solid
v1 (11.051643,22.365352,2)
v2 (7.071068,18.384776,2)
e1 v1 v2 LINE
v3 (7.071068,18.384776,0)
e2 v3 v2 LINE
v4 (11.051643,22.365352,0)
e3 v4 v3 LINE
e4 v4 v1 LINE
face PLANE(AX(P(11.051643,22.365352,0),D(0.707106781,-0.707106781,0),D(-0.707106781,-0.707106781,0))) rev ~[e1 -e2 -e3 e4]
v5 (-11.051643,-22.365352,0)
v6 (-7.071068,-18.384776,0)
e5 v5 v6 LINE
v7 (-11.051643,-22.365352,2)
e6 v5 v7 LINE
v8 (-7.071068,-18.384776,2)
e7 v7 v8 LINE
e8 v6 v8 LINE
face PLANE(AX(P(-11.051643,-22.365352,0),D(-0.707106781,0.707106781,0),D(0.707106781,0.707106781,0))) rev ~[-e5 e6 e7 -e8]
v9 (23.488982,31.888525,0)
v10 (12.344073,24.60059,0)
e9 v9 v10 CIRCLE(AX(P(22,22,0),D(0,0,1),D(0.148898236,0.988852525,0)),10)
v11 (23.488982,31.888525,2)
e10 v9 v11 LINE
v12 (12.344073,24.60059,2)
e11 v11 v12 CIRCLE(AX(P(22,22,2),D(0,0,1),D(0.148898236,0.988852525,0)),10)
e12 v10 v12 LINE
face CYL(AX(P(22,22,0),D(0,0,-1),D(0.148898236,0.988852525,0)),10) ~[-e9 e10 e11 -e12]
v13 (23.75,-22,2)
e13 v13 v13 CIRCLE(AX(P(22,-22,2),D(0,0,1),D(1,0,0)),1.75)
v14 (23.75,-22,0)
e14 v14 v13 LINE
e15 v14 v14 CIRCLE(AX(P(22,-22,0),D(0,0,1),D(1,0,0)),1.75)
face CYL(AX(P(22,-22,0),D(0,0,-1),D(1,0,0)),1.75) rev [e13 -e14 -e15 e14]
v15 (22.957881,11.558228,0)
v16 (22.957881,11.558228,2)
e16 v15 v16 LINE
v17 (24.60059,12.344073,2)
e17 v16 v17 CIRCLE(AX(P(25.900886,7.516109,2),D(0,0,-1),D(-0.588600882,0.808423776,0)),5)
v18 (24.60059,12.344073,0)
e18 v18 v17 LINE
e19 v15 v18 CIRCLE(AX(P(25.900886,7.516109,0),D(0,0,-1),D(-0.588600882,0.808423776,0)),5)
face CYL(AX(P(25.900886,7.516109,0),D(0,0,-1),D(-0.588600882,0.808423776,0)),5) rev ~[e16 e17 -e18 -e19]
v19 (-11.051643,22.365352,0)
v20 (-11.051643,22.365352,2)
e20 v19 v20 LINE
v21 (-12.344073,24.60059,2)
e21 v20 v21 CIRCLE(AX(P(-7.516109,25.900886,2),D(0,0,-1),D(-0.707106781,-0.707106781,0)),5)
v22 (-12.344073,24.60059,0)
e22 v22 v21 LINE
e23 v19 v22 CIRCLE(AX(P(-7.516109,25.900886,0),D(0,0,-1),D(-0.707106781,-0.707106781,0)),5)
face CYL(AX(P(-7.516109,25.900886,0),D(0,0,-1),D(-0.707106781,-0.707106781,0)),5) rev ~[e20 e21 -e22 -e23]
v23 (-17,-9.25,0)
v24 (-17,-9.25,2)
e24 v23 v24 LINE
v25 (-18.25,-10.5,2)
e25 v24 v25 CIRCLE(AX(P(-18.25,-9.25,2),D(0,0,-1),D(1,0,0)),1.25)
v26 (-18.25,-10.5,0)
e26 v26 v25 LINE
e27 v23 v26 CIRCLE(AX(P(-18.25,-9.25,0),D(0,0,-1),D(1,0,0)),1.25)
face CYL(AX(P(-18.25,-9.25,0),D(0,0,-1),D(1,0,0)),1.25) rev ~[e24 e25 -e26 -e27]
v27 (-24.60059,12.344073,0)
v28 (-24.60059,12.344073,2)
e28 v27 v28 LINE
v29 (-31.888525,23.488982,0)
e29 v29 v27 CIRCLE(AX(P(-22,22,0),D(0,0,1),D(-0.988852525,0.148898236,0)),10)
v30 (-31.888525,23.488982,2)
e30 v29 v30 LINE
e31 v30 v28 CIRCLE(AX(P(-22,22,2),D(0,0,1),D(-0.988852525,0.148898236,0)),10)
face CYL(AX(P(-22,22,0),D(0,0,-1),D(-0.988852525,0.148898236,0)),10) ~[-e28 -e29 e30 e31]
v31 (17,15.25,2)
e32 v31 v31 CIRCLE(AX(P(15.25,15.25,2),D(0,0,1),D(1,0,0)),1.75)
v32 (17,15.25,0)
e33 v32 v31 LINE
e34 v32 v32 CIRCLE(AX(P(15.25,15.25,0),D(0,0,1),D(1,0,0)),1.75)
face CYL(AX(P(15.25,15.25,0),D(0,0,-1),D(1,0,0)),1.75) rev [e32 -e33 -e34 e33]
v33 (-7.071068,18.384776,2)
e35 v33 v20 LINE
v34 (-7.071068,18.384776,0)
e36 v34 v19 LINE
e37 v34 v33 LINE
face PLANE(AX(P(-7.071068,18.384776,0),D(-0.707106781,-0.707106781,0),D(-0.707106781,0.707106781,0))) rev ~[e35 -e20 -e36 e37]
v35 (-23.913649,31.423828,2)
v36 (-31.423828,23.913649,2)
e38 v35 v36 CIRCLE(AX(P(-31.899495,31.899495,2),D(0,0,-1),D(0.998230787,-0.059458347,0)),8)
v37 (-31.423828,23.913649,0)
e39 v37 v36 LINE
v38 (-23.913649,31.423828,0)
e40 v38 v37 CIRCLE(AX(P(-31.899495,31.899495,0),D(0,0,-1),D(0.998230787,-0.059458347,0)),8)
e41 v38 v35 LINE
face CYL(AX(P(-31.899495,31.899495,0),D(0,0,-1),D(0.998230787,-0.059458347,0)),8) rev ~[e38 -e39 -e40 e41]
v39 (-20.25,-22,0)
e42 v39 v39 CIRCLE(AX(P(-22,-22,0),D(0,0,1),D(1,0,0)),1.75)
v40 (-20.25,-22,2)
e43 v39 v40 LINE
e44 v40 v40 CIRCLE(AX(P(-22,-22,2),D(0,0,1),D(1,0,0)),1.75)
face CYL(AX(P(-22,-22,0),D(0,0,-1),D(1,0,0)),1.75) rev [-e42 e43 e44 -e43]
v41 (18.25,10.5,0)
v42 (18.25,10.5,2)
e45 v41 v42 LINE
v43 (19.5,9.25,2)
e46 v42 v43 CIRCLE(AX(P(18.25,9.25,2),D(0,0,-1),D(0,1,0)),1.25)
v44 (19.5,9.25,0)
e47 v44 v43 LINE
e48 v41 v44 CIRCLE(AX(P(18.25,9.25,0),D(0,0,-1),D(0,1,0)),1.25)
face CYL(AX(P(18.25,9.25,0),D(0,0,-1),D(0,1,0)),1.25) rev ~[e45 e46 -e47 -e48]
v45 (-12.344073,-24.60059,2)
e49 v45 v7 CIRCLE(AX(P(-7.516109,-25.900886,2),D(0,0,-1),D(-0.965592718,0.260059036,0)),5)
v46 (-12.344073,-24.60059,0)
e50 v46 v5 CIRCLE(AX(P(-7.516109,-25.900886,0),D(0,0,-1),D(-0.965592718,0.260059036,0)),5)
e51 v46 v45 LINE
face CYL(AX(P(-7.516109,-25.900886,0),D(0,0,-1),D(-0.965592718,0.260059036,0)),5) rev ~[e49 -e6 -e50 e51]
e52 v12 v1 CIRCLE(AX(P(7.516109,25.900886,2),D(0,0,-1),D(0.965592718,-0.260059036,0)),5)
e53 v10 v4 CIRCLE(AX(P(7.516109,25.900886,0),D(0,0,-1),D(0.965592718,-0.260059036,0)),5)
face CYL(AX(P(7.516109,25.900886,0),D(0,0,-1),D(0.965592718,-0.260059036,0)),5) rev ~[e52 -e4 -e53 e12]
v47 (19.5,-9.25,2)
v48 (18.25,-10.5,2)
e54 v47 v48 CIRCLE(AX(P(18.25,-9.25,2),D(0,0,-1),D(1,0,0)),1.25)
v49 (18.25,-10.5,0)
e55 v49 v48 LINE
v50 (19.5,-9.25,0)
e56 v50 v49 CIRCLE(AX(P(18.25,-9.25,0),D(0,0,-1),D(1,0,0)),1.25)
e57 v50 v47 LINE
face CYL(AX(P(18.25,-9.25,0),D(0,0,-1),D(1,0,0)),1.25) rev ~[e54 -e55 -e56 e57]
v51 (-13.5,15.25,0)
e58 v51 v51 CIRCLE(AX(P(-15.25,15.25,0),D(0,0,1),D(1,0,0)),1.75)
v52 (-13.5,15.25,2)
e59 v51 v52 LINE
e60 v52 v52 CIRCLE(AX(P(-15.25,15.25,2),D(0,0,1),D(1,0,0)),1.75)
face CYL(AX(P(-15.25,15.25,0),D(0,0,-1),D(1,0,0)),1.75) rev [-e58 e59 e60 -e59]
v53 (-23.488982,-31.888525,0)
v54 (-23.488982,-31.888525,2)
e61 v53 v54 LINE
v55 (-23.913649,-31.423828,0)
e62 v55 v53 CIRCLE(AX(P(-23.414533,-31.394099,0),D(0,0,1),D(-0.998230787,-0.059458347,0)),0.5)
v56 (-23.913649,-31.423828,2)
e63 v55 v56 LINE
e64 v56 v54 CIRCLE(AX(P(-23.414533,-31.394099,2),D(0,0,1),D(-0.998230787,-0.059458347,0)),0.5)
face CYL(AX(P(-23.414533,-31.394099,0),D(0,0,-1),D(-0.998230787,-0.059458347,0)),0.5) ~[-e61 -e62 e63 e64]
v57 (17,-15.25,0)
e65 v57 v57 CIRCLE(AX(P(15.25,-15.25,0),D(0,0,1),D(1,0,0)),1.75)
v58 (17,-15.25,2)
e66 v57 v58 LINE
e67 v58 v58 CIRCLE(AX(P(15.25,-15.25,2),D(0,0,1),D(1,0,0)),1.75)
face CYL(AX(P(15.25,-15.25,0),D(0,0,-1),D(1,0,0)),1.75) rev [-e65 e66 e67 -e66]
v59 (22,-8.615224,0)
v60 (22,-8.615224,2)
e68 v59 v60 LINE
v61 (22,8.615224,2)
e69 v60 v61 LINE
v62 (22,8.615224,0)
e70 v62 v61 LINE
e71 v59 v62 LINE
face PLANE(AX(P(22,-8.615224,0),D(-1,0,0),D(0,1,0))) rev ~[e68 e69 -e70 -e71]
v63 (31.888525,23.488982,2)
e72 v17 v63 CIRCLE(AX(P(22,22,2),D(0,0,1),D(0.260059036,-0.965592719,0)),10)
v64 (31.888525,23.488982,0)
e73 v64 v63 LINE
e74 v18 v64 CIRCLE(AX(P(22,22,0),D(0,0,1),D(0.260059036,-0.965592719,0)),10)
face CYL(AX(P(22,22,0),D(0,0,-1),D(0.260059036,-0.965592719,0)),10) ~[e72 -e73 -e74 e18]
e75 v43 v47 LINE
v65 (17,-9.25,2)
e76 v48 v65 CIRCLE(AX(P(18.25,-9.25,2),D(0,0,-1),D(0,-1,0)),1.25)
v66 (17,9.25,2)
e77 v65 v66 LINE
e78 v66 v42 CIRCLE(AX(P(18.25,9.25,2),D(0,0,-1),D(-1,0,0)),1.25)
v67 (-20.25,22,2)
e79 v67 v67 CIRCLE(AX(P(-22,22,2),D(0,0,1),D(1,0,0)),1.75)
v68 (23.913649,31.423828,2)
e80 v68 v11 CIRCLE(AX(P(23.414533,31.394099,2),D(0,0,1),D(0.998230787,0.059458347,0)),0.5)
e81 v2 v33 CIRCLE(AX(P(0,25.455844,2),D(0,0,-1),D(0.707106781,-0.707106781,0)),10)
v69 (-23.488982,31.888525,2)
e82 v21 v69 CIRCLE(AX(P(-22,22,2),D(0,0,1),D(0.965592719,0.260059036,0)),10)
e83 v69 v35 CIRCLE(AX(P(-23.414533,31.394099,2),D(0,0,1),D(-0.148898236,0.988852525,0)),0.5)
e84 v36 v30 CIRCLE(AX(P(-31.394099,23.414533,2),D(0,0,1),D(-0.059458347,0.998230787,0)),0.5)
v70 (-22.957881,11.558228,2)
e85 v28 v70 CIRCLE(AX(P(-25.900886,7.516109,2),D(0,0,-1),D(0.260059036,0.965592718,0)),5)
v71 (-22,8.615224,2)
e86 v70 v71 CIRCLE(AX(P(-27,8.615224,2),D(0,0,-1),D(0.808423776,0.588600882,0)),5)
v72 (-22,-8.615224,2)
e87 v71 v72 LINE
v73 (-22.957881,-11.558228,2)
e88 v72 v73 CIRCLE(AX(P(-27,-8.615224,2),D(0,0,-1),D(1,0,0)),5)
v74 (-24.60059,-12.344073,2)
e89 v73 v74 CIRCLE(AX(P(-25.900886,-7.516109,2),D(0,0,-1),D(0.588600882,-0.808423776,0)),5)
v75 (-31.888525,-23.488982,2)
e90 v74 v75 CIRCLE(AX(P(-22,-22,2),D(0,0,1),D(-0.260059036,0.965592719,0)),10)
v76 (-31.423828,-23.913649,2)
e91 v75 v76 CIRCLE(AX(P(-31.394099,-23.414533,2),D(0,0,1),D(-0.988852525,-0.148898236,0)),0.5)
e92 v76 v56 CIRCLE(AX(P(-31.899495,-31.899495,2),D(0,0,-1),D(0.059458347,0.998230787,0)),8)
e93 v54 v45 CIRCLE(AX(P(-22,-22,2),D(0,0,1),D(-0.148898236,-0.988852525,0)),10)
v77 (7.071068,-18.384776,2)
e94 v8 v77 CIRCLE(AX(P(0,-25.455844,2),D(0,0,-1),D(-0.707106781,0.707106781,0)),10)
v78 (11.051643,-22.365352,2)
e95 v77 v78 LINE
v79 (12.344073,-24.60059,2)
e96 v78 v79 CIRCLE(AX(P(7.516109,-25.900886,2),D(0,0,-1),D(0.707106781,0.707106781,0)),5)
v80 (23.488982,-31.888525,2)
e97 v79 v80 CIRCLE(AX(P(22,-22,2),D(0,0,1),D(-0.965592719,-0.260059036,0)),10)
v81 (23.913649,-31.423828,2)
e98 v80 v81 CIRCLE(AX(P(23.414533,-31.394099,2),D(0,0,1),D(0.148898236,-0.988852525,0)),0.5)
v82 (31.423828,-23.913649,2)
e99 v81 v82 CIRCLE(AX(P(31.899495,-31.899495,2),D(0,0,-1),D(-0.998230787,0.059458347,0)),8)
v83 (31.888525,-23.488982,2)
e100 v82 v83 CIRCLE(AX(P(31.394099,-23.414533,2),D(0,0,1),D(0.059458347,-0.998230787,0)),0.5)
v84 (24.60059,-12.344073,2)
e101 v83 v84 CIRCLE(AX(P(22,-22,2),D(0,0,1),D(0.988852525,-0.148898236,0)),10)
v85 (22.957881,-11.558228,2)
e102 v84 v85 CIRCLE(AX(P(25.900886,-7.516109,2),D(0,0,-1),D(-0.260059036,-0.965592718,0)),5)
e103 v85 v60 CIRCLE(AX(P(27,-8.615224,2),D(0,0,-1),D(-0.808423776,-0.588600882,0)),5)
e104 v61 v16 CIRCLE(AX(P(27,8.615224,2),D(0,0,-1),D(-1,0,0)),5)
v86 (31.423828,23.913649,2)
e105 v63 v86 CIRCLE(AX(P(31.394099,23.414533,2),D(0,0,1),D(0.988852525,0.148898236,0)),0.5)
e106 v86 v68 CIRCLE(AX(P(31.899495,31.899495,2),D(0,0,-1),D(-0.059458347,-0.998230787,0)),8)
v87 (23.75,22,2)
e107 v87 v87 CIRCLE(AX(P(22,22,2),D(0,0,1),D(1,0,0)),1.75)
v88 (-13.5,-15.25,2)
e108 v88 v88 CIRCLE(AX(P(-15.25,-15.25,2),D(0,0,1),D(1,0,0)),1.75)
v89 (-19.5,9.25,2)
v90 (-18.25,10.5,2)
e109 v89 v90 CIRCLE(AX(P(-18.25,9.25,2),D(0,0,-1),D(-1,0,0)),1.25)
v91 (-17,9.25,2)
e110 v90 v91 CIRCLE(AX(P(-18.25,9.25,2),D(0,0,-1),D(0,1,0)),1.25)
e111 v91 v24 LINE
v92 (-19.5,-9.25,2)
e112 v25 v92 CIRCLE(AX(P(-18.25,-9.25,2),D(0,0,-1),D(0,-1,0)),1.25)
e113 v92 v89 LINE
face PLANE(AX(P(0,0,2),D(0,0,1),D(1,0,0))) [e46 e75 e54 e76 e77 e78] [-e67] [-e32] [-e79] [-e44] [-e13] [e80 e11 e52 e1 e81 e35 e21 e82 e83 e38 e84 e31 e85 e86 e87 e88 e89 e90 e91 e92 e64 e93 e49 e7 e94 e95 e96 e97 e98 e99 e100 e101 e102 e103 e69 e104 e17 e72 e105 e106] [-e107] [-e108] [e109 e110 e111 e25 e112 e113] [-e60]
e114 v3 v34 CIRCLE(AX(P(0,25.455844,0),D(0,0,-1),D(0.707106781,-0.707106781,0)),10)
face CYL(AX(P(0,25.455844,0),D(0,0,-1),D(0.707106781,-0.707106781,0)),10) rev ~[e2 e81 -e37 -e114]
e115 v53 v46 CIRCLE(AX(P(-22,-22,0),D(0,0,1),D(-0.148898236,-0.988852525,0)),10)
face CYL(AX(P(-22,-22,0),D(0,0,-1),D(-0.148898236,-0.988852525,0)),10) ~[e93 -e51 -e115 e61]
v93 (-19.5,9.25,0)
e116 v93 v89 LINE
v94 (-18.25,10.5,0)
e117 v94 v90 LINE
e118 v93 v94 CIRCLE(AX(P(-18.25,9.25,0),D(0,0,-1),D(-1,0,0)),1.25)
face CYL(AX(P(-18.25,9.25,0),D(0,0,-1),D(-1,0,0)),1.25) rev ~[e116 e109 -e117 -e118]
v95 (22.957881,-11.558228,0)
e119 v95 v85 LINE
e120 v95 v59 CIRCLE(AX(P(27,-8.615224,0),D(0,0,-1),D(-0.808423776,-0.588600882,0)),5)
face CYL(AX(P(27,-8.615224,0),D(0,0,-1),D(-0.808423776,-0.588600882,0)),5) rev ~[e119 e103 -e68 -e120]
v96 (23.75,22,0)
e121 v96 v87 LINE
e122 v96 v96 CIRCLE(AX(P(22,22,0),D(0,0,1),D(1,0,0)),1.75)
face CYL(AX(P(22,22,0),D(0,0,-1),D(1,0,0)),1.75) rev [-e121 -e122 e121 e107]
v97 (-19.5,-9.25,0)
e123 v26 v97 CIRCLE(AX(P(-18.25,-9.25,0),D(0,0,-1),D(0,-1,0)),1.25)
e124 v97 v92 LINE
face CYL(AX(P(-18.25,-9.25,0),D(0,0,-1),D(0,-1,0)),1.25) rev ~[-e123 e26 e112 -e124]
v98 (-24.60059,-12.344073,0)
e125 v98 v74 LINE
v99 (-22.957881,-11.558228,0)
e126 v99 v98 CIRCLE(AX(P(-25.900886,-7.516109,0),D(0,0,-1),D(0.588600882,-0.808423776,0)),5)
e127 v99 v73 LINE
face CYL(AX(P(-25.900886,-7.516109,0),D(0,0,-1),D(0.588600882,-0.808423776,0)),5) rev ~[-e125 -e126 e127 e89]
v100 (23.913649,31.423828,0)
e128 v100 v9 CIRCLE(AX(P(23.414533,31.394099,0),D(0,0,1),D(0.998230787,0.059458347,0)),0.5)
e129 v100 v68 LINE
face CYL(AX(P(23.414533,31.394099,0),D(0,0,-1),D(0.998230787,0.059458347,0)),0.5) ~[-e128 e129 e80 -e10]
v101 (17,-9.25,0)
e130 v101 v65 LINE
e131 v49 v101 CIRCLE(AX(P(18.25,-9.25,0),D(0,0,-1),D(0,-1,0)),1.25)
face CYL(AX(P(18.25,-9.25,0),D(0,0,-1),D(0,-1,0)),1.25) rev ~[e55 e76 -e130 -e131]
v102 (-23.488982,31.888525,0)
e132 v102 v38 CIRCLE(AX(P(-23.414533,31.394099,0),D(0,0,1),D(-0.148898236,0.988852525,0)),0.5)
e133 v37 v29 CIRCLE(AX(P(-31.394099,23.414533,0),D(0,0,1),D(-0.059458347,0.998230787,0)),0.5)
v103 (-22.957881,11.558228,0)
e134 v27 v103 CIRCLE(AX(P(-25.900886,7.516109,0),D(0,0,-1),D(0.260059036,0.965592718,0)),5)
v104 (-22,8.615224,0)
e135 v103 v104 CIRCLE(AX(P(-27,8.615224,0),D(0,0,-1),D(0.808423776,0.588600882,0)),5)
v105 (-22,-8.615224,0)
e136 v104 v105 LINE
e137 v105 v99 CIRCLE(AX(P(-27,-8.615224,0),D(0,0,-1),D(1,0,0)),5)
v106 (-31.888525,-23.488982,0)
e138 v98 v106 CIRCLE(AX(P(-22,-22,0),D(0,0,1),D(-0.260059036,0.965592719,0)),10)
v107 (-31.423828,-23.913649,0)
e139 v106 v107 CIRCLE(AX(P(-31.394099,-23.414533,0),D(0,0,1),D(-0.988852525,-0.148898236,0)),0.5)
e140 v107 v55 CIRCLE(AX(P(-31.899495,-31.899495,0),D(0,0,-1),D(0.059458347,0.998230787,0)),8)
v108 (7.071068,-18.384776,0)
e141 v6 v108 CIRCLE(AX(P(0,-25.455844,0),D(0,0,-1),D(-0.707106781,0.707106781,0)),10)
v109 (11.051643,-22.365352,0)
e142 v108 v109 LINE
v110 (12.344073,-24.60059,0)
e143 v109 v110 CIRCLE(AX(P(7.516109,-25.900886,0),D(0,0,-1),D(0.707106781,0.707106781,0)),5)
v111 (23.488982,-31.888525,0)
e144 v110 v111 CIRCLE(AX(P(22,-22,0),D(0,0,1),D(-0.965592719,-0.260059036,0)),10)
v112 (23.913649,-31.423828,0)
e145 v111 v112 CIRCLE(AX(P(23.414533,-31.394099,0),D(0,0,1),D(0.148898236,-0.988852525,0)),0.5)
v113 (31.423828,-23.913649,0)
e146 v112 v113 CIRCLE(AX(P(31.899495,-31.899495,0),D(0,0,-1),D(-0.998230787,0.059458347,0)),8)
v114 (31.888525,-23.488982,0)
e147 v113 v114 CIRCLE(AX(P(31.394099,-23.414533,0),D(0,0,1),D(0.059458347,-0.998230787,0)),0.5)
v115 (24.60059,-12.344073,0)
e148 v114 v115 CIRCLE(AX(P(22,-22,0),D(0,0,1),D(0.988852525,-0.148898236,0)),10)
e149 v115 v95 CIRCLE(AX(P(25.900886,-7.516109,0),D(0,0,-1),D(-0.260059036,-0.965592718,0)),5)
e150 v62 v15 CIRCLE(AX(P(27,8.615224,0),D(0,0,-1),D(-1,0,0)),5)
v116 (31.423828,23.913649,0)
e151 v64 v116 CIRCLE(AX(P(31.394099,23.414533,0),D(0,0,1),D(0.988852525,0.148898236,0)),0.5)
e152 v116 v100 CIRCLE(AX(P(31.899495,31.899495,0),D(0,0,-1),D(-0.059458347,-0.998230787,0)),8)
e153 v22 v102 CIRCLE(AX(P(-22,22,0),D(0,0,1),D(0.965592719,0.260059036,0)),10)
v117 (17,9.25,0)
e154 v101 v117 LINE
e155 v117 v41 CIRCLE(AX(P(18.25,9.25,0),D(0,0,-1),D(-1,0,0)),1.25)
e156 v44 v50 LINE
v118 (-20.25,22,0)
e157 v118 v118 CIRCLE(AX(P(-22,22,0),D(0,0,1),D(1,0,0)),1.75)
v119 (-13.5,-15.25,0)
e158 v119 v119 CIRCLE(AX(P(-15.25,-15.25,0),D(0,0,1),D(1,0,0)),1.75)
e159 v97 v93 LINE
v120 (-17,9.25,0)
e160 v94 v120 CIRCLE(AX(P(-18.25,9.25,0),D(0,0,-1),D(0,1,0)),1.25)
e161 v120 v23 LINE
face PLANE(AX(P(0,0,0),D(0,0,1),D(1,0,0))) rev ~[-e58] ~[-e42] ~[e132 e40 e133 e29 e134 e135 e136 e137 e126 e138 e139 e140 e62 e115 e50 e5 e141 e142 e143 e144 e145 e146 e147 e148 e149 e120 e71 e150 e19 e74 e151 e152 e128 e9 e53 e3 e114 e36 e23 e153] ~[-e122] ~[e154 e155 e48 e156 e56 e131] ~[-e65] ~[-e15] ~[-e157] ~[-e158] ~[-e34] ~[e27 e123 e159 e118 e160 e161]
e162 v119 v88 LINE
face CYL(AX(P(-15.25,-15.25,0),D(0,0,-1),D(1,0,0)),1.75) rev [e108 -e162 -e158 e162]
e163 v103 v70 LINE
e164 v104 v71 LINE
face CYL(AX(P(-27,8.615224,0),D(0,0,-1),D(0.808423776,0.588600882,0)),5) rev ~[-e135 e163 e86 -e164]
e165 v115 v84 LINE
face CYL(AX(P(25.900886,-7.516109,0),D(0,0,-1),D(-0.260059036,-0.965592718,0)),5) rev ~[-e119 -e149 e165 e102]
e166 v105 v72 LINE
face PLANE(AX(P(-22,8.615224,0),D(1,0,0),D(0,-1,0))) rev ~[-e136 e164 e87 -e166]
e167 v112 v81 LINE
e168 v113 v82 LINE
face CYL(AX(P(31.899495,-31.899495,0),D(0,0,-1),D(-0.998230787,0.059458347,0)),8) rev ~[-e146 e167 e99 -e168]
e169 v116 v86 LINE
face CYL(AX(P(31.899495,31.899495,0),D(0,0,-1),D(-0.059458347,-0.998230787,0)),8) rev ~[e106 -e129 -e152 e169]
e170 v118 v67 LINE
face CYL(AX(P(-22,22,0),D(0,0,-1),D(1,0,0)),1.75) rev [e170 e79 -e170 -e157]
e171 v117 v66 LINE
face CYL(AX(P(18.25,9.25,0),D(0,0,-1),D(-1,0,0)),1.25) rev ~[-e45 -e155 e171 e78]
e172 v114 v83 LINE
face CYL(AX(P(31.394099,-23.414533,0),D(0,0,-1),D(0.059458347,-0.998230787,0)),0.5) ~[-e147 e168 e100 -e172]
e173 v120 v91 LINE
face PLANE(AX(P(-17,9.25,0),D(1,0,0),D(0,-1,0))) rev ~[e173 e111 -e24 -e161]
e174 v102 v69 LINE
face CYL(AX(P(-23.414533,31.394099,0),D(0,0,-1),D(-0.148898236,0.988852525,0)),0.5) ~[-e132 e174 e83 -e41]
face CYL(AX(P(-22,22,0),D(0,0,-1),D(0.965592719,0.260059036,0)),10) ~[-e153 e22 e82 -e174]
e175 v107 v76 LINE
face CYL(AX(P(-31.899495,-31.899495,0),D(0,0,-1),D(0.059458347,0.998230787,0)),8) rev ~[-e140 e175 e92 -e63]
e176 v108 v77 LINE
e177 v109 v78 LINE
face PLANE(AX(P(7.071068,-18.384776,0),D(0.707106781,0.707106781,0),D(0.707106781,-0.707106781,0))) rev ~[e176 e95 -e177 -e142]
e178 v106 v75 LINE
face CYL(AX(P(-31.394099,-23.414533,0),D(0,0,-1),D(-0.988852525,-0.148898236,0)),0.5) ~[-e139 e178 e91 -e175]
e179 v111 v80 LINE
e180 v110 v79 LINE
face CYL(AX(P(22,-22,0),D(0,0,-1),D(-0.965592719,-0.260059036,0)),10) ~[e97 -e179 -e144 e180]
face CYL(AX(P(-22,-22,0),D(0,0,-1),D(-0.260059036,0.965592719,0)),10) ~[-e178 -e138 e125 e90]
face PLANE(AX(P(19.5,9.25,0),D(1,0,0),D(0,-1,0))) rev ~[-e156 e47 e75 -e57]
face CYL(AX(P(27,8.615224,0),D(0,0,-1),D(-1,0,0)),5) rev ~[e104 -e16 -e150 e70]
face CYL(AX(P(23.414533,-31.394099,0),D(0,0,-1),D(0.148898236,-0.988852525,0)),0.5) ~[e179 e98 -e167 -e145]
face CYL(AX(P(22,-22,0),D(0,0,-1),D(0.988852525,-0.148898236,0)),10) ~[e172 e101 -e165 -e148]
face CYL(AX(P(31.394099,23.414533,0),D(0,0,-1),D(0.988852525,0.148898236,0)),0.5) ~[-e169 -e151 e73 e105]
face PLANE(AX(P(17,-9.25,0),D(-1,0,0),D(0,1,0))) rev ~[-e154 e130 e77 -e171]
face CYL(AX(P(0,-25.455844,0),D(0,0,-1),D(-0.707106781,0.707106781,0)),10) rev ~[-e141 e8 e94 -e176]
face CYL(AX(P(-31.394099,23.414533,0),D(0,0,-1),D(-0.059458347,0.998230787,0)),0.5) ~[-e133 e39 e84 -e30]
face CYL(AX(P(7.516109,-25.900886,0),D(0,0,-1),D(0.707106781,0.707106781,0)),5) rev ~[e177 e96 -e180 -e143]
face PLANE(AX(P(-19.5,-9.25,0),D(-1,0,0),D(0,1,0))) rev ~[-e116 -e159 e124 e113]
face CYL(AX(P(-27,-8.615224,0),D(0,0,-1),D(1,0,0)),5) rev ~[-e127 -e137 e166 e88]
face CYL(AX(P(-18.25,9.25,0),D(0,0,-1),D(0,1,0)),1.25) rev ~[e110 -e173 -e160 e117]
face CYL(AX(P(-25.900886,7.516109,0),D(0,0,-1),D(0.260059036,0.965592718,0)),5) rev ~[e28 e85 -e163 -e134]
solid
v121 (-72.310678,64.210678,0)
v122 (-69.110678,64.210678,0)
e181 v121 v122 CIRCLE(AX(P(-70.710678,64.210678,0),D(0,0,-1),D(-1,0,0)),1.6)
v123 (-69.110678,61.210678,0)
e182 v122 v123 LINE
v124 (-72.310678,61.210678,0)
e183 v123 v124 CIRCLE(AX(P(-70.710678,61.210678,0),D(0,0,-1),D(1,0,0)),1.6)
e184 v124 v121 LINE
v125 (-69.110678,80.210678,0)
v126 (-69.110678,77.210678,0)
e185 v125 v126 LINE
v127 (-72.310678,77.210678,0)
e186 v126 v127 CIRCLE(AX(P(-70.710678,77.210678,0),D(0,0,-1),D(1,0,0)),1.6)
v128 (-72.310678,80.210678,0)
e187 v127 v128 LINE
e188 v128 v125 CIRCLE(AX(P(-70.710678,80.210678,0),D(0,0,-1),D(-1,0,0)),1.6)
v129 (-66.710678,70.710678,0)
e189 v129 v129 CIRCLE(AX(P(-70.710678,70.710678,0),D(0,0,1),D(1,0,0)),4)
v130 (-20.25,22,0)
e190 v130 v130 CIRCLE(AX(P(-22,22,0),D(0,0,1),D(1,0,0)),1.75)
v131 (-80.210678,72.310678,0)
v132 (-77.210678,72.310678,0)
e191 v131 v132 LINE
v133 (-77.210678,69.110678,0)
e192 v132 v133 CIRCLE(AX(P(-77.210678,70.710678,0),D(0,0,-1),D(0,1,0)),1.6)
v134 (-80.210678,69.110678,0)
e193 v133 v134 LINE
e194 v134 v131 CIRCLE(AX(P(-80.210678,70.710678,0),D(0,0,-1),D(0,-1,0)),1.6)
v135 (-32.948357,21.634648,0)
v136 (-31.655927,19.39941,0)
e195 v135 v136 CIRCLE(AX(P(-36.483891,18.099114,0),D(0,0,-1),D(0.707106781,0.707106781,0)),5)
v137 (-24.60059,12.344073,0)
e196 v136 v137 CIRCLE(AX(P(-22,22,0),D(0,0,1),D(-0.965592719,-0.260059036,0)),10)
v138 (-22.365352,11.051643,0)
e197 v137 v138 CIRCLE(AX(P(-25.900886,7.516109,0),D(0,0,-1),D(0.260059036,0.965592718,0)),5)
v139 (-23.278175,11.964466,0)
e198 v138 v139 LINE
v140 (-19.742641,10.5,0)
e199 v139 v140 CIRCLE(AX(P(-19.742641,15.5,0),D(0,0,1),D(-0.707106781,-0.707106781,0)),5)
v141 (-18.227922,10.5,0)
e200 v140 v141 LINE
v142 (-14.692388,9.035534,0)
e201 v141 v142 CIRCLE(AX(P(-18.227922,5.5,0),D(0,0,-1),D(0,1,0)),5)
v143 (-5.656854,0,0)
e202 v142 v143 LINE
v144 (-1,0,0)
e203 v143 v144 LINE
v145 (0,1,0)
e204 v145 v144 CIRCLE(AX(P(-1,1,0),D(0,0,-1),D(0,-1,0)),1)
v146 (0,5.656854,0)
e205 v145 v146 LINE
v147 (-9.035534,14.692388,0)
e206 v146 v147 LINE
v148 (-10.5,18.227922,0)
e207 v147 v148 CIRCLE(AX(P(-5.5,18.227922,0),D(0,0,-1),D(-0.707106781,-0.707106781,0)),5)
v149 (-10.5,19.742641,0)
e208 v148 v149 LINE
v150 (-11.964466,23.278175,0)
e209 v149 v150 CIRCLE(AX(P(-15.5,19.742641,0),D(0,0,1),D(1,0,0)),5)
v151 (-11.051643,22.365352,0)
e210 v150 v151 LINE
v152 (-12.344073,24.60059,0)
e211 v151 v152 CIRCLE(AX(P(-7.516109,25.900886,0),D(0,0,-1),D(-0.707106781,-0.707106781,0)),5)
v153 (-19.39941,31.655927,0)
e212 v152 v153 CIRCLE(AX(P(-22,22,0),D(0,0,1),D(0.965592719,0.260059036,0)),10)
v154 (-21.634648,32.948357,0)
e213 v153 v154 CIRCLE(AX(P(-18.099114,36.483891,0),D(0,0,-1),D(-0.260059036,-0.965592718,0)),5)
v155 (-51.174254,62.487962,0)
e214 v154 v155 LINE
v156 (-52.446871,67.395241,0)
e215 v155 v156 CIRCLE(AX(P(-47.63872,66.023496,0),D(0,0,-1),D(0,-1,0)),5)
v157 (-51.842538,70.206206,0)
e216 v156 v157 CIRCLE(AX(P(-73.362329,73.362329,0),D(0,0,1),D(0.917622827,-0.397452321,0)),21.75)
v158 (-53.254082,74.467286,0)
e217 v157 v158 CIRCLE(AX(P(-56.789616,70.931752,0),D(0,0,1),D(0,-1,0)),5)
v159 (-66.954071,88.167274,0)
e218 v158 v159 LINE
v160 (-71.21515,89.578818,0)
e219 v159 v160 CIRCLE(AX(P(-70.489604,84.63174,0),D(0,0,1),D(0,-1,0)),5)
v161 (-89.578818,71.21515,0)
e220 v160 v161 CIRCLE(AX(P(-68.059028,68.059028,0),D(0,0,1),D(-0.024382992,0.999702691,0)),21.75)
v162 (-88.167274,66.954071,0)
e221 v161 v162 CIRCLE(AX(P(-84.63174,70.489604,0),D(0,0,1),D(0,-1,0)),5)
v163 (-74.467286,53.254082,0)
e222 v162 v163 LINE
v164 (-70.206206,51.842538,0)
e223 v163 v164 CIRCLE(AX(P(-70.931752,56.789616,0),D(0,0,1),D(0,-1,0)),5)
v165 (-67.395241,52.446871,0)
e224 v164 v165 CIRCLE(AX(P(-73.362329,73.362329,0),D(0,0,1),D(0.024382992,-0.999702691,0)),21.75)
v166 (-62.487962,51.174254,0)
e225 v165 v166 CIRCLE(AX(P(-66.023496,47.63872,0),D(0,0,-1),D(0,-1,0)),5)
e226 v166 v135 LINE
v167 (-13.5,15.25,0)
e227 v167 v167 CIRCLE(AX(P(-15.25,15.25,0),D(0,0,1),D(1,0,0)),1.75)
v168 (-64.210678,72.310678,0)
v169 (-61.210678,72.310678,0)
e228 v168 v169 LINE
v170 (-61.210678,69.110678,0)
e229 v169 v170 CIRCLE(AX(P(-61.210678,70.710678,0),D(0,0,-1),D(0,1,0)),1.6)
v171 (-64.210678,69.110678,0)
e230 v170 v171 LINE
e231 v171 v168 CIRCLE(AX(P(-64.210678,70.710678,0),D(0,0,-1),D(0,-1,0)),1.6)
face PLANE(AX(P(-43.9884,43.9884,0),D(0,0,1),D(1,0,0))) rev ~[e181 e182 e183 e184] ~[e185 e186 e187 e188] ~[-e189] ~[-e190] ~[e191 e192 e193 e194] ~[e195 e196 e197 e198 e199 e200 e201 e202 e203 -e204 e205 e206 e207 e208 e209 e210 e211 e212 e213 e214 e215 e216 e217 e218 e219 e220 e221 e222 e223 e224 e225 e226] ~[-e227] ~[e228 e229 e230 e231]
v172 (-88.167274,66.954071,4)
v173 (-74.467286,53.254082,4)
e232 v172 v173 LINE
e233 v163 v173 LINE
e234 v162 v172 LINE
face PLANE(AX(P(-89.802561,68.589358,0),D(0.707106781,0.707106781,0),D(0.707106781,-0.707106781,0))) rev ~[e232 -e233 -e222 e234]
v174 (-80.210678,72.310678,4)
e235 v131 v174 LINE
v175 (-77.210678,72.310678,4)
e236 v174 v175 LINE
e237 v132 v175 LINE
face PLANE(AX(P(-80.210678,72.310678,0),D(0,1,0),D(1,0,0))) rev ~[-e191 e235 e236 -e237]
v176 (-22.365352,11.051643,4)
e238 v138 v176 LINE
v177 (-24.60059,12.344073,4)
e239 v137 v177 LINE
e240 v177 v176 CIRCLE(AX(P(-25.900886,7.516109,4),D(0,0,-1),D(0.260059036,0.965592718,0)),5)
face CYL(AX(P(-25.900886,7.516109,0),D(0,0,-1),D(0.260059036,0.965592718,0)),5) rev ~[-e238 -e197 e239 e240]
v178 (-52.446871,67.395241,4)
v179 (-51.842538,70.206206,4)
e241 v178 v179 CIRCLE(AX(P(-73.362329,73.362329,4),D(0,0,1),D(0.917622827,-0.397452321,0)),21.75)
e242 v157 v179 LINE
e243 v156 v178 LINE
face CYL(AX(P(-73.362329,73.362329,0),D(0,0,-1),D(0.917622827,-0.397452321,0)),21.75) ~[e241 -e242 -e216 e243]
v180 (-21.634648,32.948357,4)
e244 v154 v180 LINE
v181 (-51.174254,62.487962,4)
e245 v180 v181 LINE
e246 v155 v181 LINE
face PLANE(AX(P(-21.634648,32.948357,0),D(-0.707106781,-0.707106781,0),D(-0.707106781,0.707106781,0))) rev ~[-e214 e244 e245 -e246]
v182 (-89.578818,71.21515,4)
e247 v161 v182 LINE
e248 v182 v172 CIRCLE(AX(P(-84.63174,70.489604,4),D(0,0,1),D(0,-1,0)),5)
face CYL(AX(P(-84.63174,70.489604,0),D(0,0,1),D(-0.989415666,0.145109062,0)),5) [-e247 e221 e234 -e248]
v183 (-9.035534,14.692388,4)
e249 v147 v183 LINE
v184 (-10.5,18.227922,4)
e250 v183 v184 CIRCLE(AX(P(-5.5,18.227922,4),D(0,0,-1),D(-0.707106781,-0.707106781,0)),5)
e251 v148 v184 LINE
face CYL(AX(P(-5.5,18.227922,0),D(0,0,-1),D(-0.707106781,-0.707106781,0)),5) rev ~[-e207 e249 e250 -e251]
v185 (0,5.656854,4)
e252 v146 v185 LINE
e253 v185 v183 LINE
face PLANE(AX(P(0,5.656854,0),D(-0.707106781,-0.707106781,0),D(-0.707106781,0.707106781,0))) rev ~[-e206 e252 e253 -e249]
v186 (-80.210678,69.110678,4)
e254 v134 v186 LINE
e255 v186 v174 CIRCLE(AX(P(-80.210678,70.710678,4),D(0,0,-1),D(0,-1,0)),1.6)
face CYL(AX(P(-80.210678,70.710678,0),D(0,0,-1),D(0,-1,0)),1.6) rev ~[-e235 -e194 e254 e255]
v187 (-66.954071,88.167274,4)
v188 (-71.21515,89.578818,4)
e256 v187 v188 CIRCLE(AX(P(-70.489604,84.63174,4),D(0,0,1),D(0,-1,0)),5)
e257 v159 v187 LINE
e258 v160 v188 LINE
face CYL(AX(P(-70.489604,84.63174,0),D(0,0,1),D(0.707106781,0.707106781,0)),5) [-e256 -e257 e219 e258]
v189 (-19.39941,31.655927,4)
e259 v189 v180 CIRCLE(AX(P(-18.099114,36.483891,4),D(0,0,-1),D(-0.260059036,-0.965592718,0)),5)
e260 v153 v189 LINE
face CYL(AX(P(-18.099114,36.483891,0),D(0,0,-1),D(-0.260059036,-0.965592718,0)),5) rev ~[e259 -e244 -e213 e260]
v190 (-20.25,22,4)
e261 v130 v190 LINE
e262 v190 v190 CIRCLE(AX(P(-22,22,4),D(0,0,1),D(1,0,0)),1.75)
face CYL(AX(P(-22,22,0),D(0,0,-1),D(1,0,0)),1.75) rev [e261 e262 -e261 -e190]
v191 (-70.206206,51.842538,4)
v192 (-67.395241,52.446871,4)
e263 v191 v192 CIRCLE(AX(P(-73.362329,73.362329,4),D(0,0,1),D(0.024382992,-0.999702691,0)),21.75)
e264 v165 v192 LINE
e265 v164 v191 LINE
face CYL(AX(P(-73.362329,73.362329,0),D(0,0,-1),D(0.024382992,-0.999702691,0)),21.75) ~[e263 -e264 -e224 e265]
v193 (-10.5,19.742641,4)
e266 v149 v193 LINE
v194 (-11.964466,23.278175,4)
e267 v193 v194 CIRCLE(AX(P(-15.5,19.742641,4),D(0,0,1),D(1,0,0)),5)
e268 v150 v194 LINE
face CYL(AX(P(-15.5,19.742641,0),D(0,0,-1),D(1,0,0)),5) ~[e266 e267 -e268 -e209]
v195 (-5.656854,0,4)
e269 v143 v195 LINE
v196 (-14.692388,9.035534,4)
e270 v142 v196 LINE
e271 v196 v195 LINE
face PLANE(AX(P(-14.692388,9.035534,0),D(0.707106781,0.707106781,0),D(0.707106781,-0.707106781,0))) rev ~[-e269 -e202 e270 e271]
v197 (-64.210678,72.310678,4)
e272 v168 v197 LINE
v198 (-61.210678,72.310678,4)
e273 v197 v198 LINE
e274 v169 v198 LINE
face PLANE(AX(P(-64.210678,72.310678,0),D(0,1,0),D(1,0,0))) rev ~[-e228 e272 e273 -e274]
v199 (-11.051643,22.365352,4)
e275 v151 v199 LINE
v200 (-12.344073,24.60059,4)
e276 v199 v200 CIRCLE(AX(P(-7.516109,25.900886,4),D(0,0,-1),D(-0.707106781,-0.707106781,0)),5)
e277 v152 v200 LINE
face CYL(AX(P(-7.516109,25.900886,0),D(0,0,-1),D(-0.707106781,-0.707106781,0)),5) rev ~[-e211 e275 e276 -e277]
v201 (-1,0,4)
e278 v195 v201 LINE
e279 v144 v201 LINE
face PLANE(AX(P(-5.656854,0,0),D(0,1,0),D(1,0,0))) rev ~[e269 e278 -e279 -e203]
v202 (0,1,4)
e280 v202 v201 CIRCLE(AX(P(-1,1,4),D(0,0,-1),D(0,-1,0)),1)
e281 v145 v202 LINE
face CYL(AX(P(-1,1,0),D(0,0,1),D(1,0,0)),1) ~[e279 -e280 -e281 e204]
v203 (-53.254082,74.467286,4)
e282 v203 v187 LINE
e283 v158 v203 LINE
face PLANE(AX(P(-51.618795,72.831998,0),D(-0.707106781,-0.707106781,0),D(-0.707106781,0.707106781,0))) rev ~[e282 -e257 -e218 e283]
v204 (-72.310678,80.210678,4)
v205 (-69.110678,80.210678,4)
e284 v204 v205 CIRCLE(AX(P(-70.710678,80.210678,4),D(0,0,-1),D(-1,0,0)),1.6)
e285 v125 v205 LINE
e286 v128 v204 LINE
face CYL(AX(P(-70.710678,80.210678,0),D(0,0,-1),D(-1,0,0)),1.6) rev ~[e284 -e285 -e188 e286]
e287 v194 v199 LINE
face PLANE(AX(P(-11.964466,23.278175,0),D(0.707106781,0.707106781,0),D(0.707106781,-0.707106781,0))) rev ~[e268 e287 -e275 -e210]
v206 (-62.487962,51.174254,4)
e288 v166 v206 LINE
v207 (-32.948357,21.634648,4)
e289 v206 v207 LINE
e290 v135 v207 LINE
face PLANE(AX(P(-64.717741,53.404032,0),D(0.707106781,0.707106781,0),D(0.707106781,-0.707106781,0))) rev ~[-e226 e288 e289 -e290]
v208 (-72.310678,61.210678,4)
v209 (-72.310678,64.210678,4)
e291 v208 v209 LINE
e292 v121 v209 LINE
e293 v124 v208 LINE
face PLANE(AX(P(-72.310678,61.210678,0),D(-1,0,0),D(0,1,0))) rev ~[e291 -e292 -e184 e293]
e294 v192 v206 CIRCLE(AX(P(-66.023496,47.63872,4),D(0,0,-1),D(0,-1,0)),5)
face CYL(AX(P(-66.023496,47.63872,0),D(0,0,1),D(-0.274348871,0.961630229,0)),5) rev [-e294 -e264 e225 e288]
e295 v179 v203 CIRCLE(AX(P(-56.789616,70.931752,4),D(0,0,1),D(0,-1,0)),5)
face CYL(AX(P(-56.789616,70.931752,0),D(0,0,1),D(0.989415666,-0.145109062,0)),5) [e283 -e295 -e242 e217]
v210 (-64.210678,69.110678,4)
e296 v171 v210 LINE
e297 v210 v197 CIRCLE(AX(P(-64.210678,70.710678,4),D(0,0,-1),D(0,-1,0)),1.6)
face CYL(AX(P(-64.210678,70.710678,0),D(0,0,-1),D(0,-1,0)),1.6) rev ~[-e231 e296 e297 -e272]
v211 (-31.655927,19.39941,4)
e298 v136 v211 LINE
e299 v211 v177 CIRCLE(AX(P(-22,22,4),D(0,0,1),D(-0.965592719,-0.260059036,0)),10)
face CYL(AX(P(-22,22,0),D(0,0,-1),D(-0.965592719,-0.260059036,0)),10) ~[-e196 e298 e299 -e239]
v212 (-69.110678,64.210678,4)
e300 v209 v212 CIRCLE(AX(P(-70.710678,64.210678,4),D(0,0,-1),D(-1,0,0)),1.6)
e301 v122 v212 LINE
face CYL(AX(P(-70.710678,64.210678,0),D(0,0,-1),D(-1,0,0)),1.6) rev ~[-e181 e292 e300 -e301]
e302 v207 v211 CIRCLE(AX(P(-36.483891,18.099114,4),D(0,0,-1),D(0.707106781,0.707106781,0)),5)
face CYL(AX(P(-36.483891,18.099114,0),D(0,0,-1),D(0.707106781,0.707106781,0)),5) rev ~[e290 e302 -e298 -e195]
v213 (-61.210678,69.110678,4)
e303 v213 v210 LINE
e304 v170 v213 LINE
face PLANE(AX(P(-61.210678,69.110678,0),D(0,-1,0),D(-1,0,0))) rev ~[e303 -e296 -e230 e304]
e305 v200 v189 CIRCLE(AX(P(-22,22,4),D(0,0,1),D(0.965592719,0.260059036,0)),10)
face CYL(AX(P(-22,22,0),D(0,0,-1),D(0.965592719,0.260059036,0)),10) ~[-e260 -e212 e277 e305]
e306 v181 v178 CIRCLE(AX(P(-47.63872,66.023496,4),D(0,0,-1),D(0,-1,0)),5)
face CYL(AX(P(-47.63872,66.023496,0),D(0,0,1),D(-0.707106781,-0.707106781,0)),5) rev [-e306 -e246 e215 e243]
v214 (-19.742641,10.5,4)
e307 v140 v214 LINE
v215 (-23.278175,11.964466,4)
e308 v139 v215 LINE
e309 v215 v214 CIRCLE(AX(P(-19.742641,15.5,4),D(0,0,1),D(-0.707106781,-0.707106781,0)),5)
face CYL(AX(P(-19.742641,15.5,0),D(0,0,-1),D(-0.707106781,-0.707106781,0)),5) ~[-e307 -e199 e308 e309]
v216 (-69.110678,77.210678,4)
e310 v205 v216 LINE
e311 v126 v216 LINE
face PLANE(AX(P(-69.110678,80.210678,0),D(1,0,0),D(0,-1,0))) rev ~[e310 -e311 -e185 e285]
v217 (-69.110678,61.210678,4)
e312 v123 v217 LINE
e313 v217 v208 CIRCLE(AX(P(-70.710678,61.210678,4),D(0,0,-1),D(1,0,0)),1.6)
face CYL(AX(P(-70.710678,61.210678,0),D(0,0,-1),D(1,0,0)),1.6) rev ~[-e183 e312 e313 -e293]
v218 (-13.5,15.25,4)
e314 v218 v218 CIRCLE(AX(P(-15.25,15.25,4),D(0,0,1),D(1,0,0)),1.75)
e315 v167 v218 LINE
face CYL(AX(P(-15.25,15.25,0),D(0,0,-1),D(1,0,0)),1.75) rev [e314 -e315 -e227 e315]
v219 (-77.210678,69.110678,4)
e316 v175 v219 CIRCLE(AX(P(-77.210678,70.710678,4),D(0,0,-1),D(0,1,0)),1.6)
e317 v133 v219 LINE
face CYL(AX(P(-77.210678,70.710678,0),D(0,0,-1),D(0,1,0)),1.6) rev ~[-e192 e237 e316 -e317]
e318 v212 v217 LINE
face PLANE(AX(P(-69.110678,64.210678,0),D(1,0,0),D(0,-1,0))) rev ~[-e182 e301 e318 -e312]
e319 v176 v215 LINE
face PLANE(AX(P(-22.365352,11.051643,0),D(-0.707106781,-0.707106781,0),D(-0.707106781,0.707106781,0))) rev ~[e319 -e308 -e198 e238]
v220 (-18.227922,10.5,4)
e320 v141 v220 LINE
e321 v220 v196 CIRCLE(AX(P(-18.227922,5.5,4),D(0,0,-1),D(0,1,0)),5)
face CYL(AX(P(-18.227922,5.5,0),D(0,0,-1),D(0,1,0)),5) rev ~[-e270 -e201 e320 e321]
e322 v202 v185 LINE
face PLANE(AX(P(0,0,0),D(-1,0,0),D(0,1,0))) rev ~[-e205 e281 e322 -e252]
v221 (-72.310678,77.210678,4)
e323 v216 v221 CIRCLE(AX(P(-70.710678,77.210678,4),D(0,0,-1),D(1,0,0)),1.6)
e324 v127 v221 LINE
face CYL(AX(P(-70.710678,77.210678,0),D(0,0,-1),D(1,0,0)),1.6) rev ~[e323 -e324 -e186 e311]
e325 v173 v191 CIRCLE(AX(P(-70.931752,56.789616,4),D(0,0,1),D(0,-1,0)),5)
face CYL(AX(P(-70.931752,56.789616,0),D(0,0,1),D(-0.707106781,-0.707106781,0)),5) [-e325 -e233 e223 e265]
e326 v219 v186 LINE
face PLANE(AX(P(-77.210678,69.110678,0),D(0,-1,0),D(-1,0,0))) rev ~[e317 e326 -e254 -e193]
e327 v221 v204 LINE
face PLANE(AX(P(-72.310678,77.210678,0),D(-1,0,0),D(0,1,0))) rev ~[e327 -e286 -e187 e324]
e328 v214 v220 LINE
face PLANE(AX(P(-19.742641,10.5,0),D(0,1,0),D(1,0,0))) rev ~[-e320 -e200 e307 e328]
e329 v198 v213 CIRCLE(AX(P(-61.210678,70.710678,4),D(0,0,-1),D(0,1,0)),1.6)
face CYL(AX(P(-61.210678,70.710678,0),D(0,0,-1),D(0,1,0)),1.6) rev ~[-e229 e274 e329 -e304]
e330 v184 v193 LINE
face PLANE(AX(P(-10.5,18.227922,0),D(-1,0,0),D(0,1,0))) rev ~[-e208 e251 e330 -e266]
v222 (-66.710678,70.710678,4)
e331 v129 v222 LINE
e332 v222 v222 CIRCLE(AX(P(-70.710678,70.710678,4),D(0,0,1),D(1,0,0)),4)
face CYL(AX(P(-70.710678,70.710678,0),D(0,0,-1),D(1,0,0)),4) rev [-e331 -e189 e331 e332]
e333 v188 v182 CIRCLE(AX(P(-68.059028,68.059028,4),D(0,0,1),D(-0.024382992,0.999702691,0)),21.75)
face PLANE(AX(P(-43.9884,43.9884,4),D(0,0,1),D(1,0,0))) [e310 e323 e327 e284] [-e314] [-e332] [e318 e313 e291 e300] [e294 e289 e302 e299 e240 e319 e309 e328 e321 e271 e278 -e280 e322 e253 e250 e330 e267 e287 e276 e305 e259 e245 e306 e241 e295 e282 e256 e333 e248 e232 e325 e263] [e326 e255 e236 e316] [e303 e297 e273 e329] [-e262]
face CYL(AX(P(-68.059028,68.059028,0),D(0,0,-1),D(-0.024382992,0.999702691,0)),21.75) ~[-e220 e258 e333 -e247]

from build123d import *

# Parameters (mm, degrees)
F0_R     = 1.75
F0_R_2   = 4
F1_DEPTH = 4
F2_R     = 5
F3_R     = 1
F4_R     = 1.75
F5_DEPTH = 2


with BuildPart() as f1:
    # F0 (on Top) → F1 (new body)
    with BuildSketch(Plane.XY):
        with BuildLine():
            Line((-21.6346483726, 32.9483568716), (-53.4040320636, 64.7177405626))
            ThreePointArc((-53.4040320636, 64.7177405626), (-52.1203664971, 68.6888343282), (-51.6187950266, 72.8319984622))
            Line((-51.6187950266, 72.8319984622), (-68.5893577751, 89.8025612107))
            ThreePointArc((-68.5893577751, 89.8025612107), (-83.43860018, 83.43860018), (-89.8025612107, 68.5893577751))
            Line((-89.8025612107, 68.5893577751), (-72.8319984622, 51.6187950266))
            ThreePointArc((-72.8319984622, 51.6187950266), (-68.6888343282, 52.1203664971), (-64.7177405626, 53.4040320636))
            Line((-64.7177405626, 53.4040320636), (-32.9483568716, 21.6346483726))
            ThreePointArc((-32.9483568716, 21.6346483726), (-32.1553695931, 20.6018937928), (-31.655927185, 19.3994096445))
            ThreePointArc((-31.655927185, 19.3994096445), (-29.0710678119, 14.9289321881), (-24.6005903555, 12.344072815))
            ThreePointArc((-24.6005903555, 12.344072815), (-23.3981062072, 11.8446304069), (-22.3653516274, 11.0516431284))
            Line((-22.3653516274, 11.0516431284), (-23.2781745931, 11.9644660941))
            ThreePointArc((-23.2781745931, 11.9644660941), (-21.6560578489, 10.8806023374), (-19.7426406871, 10.5))
            Line((-19.7426406871, 10.5), (-18.2279220614, 10.5))
            ThreePointArc((-18.2279220614, 10.5), (-16.3145048995, 10.1193976626), (-14.6923881554, 9.0355339059))
            Line((-14.6923881554, 9.0355339059), (-5.6568542495, 0))
            Line((-5.6568542495, 0), (0, 0))
            Line((0, 0), (0, 5.6568542495))
            Line((0, 5.6568542495), (-9.0355339059, 14.6923881554))
            ThreePointArc((-9.0355339059, 14.6923881554), (-10.1193976626, 16.3145048995), (-10.5, 18.2279220614))
            Line((-10.5, 18.2279220614), (-10.5, 19.7426406871))
            ThreePointArc((-10.5, 19.7426406871), (-10.8806023374, 21.6560578489), (-11.9644660941, 23.2781745931))
            Line((-11.9644660941, 23.2781745931), (-11.0516431284, 22.3653516274))
            ThreePointArc((-11.0516431284, 22.3653516274), (-11.8446304069, 23.3981062072), (-12.344072815, 24.6005903555))
            ThreePointArc((-12.344072815, 24.6005903555), (-14.9289321881, 29.0710678119), (-19.3994096445, 31.655927185))
            ThreePointArc((-19.3994096445, 31.655927185), (-20.6018937928, 32.1553695931), (-21.6346483726, 32.9483568716))
        make_face()
        with Locations((-15.25, 15.25)):
            Circle(F0_R, mode=Mode.SUBTRACT)
        with Locations((-22, 22)):
            Circle(F0_R, mode=Mode.SUBTRACT)
        with BuildLine():
            Line((-69.1106781187, 64.2106781187), (-69.1106781187, 61.2106781187))
            ThreePointArc((-69.1106781187, 61.2106781187), (-70.7106781187, 59.6106781187), (-72.3106781187, 61.2106781187))
            Line((-72.3106781187, 61.2106781187), (-72.3106781187, 64.2106781187))
            ThreePointArc((-72.3106781187, 64.2106781187), (-70.7106781187, 65.8106781187), (-69.1106781187, 64.2106781187))
        make_face(mode=Mode.SUBTRACT)
        with BuildLine():
            Line((-77.2106781187, 69.1106781187), (-80.2106781187, 69.1106781187))
            ThreePointArc((-80.2106781187, 69.1106781187), (-81.8106781187, 70.7106781187), (-80.2106781187, 72.3106781187))
            Line((-80.2106781187, 72.3106781187), (-77.2106781187, 72.3106781187))
            ThreePointArc((-77.2106781187, 72.3106781187), (-75.6106781187, 70.7106781187), (-77.2106781187, 69.1106781187))
        make_face(mode=Mode.SUBTRACT)
        with Locations((-70.7106781187, 70.7106781187)):
            Circle(F0_R_2, mode=Mode.SUBTRACT)
        with BuildLine():
            Line((-69.1106781187, 80.2106781187), (-69.1106781187, 77.2106781187))
            ThreePointArc((-69.1106781187, 77.2106781187), (-70.7106781187, 75.6106781187), (-72.3106781187, 77.2106781187))
            Line((-72.3106781187, 77.2106781187), (-72.3106781187, 80.2106781187))
            ThreePointArc((-72.3106781187, 80.2106781187), (-70.7106781187, 81.8106781187), (-69.1106781187, 80.2106781187))
        make_face(mode=Mode.SUBTRACT)
        with BuildLine():
            Line((-64.2106781187, 72.3106781187), (-61.2106781187, 72.3106781187))
            ThreePointArc((-61.2106781187, 72.3106781187), (-59.6106781187, 70.7106781187), (-61.2106781187, 69.1106781187))
            Line((-61.2106781187, 69.1106781187), (-64.2106781187, 69.1106781187))
            ThreePointArc((-64.2106781187, 69.1106781187), (-65.8106781187, 70.7106781187), (-64.2106781187, 72.3106781187))
        make_face(mode=Mode.SUBTRACT)
    extrude(amount=F1_DEPTH)

    # F2
    f2_edges = [f1.edges().sort_by_distance(p)[0] for p in [
        (-64.717741, 53.404032, 2),
        (-53.404032, 64.717741, 2),
        (-72.831998, 51.618795, 2),
        (-51.618795, 72.831998, 2),
        (-89.802561, 68.589358, 2),
        (-68.589358, 89.802561, 2),
    ]]
    fillet(f2_edges, radius=F2_R)

    # F3
    f3_edges = [f1.edges().sort_by_distance(p)[0] for p in [
        (0, 0, 2),
    ]]
    fillet(f3_edges, radius=F3_R)


with BuildPart() as f5:
    # F4 (on Top) → F5 (new body)
    with BuildSketch(Plane.XY):
        with BuildLine():
            ThreePointArc((-11.0516431284, 22.3653516274), (-11.8446304069, 23.3981062072), (-12.344072815, 24.6005903555))
            ThreePointArc((-12.344072815, 24.6005903555), (-16.5270441555, 30.3693939042), (-23.4889823618, 31.8885252453))
            ThreePointArc((-23.4889823618, 31.8885252453), (-23.7836266036, 31.7313972067), (-23.9136486374, 31.4238281567))
            ThreePointArc((-23.9136486374, 31.4238281567), (-26.2426406871, 26.2426406871), (-31.4238281567, 23.9136486374))
            ThreePointArc((-31.4238281567, 23.9136486374), (-31.7313972067, 23.7836266036), (-31.8885252453, 23.4889823618))
            ThreePointArc((-31.8885252453, 23.4889823618), (-30.3693939042, 16.5270441555), (-24.6005903555, 12.344072815))
            ThreePointArc((-24.6005903555, 12.344072815), (-23.7431585277, 12.0265653157), (-22.9578811212, 11.5582281012))
            ThreePointArc((-22.9578811212, 11.5582281012), (-22.2454971662, 10.1627064202), (-22, 8.6152236891))
            Line((-22, 8.6152236891), (-22, 0))
            Line((-22, 0), (-22, -8.6152236891))
            ThreePointArc((-22, -8.6152236891), (-22.2454971662, -10.1627064202), (-22.9578811212, -11.5582281012))
            ThreePointArc((-22.9578811212, -11.5582281012), (-23.7431585277, -12.0265653157), (-24.6005903555, -12.344072815))
            ThreePointArc((-24.6005903555, -12.344072815), (-30.3693939042, -16.5270441555), (-31.8885252453, -23.4889823618))
            ThreePointArc((-31.8885252453, -23.4889823618), (-31.7313972067, -23.7836266036), (-31.4238281567, -23.9136486374))
            ThreePointArc((-31.4238281567, -23.9136486374), (-26.2426406871, -26.2426406871), (-23.9136486374, -31.4238281567))
            ThreePointArc((-23.9136486374, -31.4238281567), (-23.7836266036, -31.7313972067), (-23.4889823618, -31.8885252453))
            ThreePointArc((-23.4889823618, -31.8885252453), (-16.5270441555, -30.3693939042), (-12.344072815, -24.6005903555))
            ThreePointArc((-12.344072815, -24.6005903555), (-11.8446304069, -23.3981062072), (-11.0516431284, -22.3653516274))
            Line((-11.0516431284, -22.3653516274), (-7.0710678119, -18.3847763109))
            ThreePointArc((-7.0710678119, -18.3847763109), (0, -15.4558441227), (7.0710678119, -18.3847763109))
            Line((7.0710678119, -18.3847763109), (11.0516431284, -22.3653516274))
            ThreePointArc((11.0516431284, -22.3653516274), (11.8446304069, -23.3981062072), (12.344072815, -24.6005903555))
            ThreePointArc((12.344072815, -24.6005903555), (16.5270441555, -30.3693939042), (23.4889823618, -31.8885252453))
            ThreePointArc((23.4889823618, -31.8885252453), (23.7836266036, -31.7313972067), (23.9136486374, -31.4238281567))
            ThreePointArc((23.9136486374, -31.4238281567), (26.2426406871, -26.2426406871), (31.4238281567, -23.9136486374))
            ThreePointArc((31.4238281567, -23.9136486374), (31.7313972067, -23.7836266036), (31.8885252453, -23.4889823618))
            ThreePointArc((31.8885252453, -23.4889823618), (30.3693939042, -16.5270441555), (24.6005903555, -12.344072815))
            ThreePointArc((24.6005903555, -12.344072815), (23.7431585277, -12.0265653157), (22.9578811212, -11.5582281012))
            ThreePointArc((22.9578811212, -11.5582281012), (22.2454971662, -10.1627064202), (22, -8.6152236891))
            Line((22, -8.6152236891), (22, 0))
            Line((22, 0), (22, 8.6152236891))
            ThreePointArc((22, 8.6152236891), (22.2454971662, 10.1627064202), (22.9578811212, 11.5582281012))
            ThreePointArc((22.9578811212, 11.5582281012), (23.7431585277, 12.0265653157), (24.6005903555, 12.344072815))
            ThreePointArc((24.6005903555, 12.344072815), (30.3693939042, 16.5270441555), (31.8885252453, 23.4889823618))
            ThreePointArc((31.8885252453, 23.4889823618), (31.7313972067, 23.7836266036), (31.4238281567, 23.9136486374))
            ThreePointArc((31.4238281567, 23.9136486374), (26.2426406871, 26.2426406871), (23.9136486374, 31.4238281567))
            ThreePointArc((23.9136486374, 31.4238281567), (23.7836266036, 31.7313972067), (23.4889823618, 31.8885252453))
            ThreePointArc((23.4889823618, 31.8885252453), (16.5270441555, 30.3693939042), (12.344072815, 24.6005903555))
            ThreePointArc((12.344072815, 24.6005903555), (11.8446304069, 23.3981062072), (11.0516431284, 22.3653516274))
            Line((11.0516431284, 22.3653516274), (7.0710678119, 18.3847763109))
            ThreePointArc((7.0710678119, 18.3847763109), (0, 15.4558441227), (-7.0710678119, 18.3847763109))
            Line((-7.0710678119, 18.3847763109), (-11.0516431284, 22.3653516274))
        make_face()
        with Locations((-22, -22)):
            Circle(F4_R, mode=Mode.SUBTRACT)
        with BuildLine():
            ThreePointArc((-23.4644660941, -12.1507575951), (-23.1996081476, -11.864380775), (-22.9578811212, -11.5582281012))
            ThreePointArc((-22.9578811212, -11.5582281012), (-22.6517284475, -11.3165010748), (-22.3653516274, -11.0516431284))
            Line((-22.3653516274, -11.0516431284), (-23.4644660941, -12.1507575951))
        make_face(mode=Mode.SUBTRACT)
        with Locations((-15.25, -15.25)):
            Circle(F4_R, mode=Mode.SUBTRACT)
        with Locations((22, -22)):
            Circle(F4_R, mode=Mode.SUBTRACT)
        with Locations((15.25, -15.25)):
            Circle(F4_R, mode=Mode.SUBTRACT)
        with BuildLine():
            ThreePointArc((22.3653516274, -11.0516431284), (22.6517284475, -11.3165010748), (22.9578811212, -11.5582281012))
            ThreePointArc((22.9578811212, -11.5582281012), (23.1996081476, -11.864380775), (23.4644660941, -12.1507575951))
            Line((23.4644660941, -12.1507575951), (22.3653516274, -11.0516431284))
        make_face(mode=Mode.SUBTRACT)
        with BuildLine():
            Line((-19.5, 0), (-19.5, 9.25))
            ThreePointArc((-19.5, 9.25), (-19.1338834765, 10.1338834765), (-18.25, 10.5))
            ThreePointArc((-18.25, 10.5), (-17.3661165235, 10.1338834765), (-17, 9.25))
            Line((-17, 9.25), (-17, 0))
            Line((-17, 0), (-17, -9.25))
            ThreePointArc((-17, -9.25), (-17.3661165235, -10.1338834765), (-18.25, -10.5))
            ThreePointArc((-18.25, -10.5), (-19.1338834765, -10.1338834765), (-19.5, -9.25))
            Line((-19.5, -9.25), (-19.5, 0))
        make_face(mode=Mode.SUBTRACT)
        with BuildLine():
            ThreePointArc((-22.3653516274, 11.0516431284), (-22.6517284475, 11.3165010748), (-22.9578811212, 11.5582281012))
            ThreePointArc((-22.9578811212, 11.5582281012), (-23.1996081476, 11.864380775), (-23.4644660941, 12.1507575951))
            Line((-23.4644660941, 12.1507575951), (-22.3653516274, 11.0516431284))
        make_face(mode=Mode.SUBTRACT)
        with Locations((-15.25, 15.25)):
            Circle(F4_R, mode=Mode.SUBTRACT)
        with Locations((-22, 22)):
            Circle(F4_R, mode=Mode.SUBTRACT)
        with Locations((15.25, 15.25)):
            Circle(F4_R, mode=Mode.SUBTRACT)
        with BuildLine():
            ThreePointArc((17, 9.25), (17.3661165235, 10.1338834765), (18.25, 10.5))
            ThreePointArc((18.25, 10.5), (19.1338834765, 10.1338834765), (19.5, 9.25))
            Line((19.5, 9.25), (19.5, 0))
            Line((19.5, 0), (19.5, -9.25))
            ThreePointArc((19.5, -9.25), (19.1338834765, -10.1338834765), (18.25, -10.5))
            ThreePointArc((18.25, -10.5), (17.3661165235, -10.1338834765), (17, -9.25))
            Line((17, -9.25), (17, 0))
            Line((17, 0), (17, 9.25))
        make_face(mode=Mode.SUBTRACT)
        with BuildLine():
            ThreePointArc((23.4644660941, 12.1507575951), (23.1996081476, 11.864380775), (22.9578811212, 11.5582281012))
            ThreePointArc((22.9578811212, 11.5582281012), (22.6517284475, 11.3165010748), (22.3653516274, 11.0516431284))
            Line((22.3653516274, 11.0516431284), (23.4644660941, 12.1507575951))
        make_face(mode=Mode.SUBTRACT)
        with Locations((22, 22)):
            Circle(F4_R, mode=Mode.SUBTRACT)
        with BuildLine():
            ThreePointArc((-23.4644660941, 12.1507575951), (-23.1996081476, 11.864380775), (-22.9578811212, 11.5582281012))
            ThreePointArc((-22.9578811212, 11.5582281012), (-22.6517284475, 11.3165010748), (-22.3653516274, 11.0516431284))
            Line((-22.3653516274, 11.0516431284), (-23.4644660941, 12.1507575951))
        make_face()
        with BuildLine():
            ThreePointArc((-22.3653516274, -11.0516431284), (-22.6517284475, -11.3165010748), (-22.9578811212, -11.5582281012))
            ThreePointArc((-22.9578811212, -11.5582281012), (-23.1996081476, -11.864380775), (-23.4644660941, -12.1507575951))
            Line((-23.4644660941, -12.1507575951), (-22.3653516274, -11.0516431284))
        make_face()
        with BuildLine():
            ThreePointArc((23.4644660941, -12.1507575951), (23.1996081476, -11.864380775), (22.9578811212, -11.5582281012))
            ThreePointArc((22.9578811212, -11.5582281012), (22.6517284475, -11.3165010748), (22.3653516274, -11.0516431284))
            Line((22.3653516274, -11.0516431284), (23.4644660941, -12.1507575951))
        make_face()
        with BuildLine():
            ThreePointArc((22.3653516274, 11.0516431284), (22.6517284475, 11.3165010748), (22.9578811212, 11.5582281012))
            ThreePointArc((22.9578811212, 11.5582281012), (23.1996081476, 11.864380775), (23.4644660941, 12.1507575951))
            Line((23.4644660941, 12.1507575951), (22.3653516274, 11.0516431284))
        make_face()
    extrude(amount=F5_DEPTH)


solid = Compound([f1.part, f5.part])
